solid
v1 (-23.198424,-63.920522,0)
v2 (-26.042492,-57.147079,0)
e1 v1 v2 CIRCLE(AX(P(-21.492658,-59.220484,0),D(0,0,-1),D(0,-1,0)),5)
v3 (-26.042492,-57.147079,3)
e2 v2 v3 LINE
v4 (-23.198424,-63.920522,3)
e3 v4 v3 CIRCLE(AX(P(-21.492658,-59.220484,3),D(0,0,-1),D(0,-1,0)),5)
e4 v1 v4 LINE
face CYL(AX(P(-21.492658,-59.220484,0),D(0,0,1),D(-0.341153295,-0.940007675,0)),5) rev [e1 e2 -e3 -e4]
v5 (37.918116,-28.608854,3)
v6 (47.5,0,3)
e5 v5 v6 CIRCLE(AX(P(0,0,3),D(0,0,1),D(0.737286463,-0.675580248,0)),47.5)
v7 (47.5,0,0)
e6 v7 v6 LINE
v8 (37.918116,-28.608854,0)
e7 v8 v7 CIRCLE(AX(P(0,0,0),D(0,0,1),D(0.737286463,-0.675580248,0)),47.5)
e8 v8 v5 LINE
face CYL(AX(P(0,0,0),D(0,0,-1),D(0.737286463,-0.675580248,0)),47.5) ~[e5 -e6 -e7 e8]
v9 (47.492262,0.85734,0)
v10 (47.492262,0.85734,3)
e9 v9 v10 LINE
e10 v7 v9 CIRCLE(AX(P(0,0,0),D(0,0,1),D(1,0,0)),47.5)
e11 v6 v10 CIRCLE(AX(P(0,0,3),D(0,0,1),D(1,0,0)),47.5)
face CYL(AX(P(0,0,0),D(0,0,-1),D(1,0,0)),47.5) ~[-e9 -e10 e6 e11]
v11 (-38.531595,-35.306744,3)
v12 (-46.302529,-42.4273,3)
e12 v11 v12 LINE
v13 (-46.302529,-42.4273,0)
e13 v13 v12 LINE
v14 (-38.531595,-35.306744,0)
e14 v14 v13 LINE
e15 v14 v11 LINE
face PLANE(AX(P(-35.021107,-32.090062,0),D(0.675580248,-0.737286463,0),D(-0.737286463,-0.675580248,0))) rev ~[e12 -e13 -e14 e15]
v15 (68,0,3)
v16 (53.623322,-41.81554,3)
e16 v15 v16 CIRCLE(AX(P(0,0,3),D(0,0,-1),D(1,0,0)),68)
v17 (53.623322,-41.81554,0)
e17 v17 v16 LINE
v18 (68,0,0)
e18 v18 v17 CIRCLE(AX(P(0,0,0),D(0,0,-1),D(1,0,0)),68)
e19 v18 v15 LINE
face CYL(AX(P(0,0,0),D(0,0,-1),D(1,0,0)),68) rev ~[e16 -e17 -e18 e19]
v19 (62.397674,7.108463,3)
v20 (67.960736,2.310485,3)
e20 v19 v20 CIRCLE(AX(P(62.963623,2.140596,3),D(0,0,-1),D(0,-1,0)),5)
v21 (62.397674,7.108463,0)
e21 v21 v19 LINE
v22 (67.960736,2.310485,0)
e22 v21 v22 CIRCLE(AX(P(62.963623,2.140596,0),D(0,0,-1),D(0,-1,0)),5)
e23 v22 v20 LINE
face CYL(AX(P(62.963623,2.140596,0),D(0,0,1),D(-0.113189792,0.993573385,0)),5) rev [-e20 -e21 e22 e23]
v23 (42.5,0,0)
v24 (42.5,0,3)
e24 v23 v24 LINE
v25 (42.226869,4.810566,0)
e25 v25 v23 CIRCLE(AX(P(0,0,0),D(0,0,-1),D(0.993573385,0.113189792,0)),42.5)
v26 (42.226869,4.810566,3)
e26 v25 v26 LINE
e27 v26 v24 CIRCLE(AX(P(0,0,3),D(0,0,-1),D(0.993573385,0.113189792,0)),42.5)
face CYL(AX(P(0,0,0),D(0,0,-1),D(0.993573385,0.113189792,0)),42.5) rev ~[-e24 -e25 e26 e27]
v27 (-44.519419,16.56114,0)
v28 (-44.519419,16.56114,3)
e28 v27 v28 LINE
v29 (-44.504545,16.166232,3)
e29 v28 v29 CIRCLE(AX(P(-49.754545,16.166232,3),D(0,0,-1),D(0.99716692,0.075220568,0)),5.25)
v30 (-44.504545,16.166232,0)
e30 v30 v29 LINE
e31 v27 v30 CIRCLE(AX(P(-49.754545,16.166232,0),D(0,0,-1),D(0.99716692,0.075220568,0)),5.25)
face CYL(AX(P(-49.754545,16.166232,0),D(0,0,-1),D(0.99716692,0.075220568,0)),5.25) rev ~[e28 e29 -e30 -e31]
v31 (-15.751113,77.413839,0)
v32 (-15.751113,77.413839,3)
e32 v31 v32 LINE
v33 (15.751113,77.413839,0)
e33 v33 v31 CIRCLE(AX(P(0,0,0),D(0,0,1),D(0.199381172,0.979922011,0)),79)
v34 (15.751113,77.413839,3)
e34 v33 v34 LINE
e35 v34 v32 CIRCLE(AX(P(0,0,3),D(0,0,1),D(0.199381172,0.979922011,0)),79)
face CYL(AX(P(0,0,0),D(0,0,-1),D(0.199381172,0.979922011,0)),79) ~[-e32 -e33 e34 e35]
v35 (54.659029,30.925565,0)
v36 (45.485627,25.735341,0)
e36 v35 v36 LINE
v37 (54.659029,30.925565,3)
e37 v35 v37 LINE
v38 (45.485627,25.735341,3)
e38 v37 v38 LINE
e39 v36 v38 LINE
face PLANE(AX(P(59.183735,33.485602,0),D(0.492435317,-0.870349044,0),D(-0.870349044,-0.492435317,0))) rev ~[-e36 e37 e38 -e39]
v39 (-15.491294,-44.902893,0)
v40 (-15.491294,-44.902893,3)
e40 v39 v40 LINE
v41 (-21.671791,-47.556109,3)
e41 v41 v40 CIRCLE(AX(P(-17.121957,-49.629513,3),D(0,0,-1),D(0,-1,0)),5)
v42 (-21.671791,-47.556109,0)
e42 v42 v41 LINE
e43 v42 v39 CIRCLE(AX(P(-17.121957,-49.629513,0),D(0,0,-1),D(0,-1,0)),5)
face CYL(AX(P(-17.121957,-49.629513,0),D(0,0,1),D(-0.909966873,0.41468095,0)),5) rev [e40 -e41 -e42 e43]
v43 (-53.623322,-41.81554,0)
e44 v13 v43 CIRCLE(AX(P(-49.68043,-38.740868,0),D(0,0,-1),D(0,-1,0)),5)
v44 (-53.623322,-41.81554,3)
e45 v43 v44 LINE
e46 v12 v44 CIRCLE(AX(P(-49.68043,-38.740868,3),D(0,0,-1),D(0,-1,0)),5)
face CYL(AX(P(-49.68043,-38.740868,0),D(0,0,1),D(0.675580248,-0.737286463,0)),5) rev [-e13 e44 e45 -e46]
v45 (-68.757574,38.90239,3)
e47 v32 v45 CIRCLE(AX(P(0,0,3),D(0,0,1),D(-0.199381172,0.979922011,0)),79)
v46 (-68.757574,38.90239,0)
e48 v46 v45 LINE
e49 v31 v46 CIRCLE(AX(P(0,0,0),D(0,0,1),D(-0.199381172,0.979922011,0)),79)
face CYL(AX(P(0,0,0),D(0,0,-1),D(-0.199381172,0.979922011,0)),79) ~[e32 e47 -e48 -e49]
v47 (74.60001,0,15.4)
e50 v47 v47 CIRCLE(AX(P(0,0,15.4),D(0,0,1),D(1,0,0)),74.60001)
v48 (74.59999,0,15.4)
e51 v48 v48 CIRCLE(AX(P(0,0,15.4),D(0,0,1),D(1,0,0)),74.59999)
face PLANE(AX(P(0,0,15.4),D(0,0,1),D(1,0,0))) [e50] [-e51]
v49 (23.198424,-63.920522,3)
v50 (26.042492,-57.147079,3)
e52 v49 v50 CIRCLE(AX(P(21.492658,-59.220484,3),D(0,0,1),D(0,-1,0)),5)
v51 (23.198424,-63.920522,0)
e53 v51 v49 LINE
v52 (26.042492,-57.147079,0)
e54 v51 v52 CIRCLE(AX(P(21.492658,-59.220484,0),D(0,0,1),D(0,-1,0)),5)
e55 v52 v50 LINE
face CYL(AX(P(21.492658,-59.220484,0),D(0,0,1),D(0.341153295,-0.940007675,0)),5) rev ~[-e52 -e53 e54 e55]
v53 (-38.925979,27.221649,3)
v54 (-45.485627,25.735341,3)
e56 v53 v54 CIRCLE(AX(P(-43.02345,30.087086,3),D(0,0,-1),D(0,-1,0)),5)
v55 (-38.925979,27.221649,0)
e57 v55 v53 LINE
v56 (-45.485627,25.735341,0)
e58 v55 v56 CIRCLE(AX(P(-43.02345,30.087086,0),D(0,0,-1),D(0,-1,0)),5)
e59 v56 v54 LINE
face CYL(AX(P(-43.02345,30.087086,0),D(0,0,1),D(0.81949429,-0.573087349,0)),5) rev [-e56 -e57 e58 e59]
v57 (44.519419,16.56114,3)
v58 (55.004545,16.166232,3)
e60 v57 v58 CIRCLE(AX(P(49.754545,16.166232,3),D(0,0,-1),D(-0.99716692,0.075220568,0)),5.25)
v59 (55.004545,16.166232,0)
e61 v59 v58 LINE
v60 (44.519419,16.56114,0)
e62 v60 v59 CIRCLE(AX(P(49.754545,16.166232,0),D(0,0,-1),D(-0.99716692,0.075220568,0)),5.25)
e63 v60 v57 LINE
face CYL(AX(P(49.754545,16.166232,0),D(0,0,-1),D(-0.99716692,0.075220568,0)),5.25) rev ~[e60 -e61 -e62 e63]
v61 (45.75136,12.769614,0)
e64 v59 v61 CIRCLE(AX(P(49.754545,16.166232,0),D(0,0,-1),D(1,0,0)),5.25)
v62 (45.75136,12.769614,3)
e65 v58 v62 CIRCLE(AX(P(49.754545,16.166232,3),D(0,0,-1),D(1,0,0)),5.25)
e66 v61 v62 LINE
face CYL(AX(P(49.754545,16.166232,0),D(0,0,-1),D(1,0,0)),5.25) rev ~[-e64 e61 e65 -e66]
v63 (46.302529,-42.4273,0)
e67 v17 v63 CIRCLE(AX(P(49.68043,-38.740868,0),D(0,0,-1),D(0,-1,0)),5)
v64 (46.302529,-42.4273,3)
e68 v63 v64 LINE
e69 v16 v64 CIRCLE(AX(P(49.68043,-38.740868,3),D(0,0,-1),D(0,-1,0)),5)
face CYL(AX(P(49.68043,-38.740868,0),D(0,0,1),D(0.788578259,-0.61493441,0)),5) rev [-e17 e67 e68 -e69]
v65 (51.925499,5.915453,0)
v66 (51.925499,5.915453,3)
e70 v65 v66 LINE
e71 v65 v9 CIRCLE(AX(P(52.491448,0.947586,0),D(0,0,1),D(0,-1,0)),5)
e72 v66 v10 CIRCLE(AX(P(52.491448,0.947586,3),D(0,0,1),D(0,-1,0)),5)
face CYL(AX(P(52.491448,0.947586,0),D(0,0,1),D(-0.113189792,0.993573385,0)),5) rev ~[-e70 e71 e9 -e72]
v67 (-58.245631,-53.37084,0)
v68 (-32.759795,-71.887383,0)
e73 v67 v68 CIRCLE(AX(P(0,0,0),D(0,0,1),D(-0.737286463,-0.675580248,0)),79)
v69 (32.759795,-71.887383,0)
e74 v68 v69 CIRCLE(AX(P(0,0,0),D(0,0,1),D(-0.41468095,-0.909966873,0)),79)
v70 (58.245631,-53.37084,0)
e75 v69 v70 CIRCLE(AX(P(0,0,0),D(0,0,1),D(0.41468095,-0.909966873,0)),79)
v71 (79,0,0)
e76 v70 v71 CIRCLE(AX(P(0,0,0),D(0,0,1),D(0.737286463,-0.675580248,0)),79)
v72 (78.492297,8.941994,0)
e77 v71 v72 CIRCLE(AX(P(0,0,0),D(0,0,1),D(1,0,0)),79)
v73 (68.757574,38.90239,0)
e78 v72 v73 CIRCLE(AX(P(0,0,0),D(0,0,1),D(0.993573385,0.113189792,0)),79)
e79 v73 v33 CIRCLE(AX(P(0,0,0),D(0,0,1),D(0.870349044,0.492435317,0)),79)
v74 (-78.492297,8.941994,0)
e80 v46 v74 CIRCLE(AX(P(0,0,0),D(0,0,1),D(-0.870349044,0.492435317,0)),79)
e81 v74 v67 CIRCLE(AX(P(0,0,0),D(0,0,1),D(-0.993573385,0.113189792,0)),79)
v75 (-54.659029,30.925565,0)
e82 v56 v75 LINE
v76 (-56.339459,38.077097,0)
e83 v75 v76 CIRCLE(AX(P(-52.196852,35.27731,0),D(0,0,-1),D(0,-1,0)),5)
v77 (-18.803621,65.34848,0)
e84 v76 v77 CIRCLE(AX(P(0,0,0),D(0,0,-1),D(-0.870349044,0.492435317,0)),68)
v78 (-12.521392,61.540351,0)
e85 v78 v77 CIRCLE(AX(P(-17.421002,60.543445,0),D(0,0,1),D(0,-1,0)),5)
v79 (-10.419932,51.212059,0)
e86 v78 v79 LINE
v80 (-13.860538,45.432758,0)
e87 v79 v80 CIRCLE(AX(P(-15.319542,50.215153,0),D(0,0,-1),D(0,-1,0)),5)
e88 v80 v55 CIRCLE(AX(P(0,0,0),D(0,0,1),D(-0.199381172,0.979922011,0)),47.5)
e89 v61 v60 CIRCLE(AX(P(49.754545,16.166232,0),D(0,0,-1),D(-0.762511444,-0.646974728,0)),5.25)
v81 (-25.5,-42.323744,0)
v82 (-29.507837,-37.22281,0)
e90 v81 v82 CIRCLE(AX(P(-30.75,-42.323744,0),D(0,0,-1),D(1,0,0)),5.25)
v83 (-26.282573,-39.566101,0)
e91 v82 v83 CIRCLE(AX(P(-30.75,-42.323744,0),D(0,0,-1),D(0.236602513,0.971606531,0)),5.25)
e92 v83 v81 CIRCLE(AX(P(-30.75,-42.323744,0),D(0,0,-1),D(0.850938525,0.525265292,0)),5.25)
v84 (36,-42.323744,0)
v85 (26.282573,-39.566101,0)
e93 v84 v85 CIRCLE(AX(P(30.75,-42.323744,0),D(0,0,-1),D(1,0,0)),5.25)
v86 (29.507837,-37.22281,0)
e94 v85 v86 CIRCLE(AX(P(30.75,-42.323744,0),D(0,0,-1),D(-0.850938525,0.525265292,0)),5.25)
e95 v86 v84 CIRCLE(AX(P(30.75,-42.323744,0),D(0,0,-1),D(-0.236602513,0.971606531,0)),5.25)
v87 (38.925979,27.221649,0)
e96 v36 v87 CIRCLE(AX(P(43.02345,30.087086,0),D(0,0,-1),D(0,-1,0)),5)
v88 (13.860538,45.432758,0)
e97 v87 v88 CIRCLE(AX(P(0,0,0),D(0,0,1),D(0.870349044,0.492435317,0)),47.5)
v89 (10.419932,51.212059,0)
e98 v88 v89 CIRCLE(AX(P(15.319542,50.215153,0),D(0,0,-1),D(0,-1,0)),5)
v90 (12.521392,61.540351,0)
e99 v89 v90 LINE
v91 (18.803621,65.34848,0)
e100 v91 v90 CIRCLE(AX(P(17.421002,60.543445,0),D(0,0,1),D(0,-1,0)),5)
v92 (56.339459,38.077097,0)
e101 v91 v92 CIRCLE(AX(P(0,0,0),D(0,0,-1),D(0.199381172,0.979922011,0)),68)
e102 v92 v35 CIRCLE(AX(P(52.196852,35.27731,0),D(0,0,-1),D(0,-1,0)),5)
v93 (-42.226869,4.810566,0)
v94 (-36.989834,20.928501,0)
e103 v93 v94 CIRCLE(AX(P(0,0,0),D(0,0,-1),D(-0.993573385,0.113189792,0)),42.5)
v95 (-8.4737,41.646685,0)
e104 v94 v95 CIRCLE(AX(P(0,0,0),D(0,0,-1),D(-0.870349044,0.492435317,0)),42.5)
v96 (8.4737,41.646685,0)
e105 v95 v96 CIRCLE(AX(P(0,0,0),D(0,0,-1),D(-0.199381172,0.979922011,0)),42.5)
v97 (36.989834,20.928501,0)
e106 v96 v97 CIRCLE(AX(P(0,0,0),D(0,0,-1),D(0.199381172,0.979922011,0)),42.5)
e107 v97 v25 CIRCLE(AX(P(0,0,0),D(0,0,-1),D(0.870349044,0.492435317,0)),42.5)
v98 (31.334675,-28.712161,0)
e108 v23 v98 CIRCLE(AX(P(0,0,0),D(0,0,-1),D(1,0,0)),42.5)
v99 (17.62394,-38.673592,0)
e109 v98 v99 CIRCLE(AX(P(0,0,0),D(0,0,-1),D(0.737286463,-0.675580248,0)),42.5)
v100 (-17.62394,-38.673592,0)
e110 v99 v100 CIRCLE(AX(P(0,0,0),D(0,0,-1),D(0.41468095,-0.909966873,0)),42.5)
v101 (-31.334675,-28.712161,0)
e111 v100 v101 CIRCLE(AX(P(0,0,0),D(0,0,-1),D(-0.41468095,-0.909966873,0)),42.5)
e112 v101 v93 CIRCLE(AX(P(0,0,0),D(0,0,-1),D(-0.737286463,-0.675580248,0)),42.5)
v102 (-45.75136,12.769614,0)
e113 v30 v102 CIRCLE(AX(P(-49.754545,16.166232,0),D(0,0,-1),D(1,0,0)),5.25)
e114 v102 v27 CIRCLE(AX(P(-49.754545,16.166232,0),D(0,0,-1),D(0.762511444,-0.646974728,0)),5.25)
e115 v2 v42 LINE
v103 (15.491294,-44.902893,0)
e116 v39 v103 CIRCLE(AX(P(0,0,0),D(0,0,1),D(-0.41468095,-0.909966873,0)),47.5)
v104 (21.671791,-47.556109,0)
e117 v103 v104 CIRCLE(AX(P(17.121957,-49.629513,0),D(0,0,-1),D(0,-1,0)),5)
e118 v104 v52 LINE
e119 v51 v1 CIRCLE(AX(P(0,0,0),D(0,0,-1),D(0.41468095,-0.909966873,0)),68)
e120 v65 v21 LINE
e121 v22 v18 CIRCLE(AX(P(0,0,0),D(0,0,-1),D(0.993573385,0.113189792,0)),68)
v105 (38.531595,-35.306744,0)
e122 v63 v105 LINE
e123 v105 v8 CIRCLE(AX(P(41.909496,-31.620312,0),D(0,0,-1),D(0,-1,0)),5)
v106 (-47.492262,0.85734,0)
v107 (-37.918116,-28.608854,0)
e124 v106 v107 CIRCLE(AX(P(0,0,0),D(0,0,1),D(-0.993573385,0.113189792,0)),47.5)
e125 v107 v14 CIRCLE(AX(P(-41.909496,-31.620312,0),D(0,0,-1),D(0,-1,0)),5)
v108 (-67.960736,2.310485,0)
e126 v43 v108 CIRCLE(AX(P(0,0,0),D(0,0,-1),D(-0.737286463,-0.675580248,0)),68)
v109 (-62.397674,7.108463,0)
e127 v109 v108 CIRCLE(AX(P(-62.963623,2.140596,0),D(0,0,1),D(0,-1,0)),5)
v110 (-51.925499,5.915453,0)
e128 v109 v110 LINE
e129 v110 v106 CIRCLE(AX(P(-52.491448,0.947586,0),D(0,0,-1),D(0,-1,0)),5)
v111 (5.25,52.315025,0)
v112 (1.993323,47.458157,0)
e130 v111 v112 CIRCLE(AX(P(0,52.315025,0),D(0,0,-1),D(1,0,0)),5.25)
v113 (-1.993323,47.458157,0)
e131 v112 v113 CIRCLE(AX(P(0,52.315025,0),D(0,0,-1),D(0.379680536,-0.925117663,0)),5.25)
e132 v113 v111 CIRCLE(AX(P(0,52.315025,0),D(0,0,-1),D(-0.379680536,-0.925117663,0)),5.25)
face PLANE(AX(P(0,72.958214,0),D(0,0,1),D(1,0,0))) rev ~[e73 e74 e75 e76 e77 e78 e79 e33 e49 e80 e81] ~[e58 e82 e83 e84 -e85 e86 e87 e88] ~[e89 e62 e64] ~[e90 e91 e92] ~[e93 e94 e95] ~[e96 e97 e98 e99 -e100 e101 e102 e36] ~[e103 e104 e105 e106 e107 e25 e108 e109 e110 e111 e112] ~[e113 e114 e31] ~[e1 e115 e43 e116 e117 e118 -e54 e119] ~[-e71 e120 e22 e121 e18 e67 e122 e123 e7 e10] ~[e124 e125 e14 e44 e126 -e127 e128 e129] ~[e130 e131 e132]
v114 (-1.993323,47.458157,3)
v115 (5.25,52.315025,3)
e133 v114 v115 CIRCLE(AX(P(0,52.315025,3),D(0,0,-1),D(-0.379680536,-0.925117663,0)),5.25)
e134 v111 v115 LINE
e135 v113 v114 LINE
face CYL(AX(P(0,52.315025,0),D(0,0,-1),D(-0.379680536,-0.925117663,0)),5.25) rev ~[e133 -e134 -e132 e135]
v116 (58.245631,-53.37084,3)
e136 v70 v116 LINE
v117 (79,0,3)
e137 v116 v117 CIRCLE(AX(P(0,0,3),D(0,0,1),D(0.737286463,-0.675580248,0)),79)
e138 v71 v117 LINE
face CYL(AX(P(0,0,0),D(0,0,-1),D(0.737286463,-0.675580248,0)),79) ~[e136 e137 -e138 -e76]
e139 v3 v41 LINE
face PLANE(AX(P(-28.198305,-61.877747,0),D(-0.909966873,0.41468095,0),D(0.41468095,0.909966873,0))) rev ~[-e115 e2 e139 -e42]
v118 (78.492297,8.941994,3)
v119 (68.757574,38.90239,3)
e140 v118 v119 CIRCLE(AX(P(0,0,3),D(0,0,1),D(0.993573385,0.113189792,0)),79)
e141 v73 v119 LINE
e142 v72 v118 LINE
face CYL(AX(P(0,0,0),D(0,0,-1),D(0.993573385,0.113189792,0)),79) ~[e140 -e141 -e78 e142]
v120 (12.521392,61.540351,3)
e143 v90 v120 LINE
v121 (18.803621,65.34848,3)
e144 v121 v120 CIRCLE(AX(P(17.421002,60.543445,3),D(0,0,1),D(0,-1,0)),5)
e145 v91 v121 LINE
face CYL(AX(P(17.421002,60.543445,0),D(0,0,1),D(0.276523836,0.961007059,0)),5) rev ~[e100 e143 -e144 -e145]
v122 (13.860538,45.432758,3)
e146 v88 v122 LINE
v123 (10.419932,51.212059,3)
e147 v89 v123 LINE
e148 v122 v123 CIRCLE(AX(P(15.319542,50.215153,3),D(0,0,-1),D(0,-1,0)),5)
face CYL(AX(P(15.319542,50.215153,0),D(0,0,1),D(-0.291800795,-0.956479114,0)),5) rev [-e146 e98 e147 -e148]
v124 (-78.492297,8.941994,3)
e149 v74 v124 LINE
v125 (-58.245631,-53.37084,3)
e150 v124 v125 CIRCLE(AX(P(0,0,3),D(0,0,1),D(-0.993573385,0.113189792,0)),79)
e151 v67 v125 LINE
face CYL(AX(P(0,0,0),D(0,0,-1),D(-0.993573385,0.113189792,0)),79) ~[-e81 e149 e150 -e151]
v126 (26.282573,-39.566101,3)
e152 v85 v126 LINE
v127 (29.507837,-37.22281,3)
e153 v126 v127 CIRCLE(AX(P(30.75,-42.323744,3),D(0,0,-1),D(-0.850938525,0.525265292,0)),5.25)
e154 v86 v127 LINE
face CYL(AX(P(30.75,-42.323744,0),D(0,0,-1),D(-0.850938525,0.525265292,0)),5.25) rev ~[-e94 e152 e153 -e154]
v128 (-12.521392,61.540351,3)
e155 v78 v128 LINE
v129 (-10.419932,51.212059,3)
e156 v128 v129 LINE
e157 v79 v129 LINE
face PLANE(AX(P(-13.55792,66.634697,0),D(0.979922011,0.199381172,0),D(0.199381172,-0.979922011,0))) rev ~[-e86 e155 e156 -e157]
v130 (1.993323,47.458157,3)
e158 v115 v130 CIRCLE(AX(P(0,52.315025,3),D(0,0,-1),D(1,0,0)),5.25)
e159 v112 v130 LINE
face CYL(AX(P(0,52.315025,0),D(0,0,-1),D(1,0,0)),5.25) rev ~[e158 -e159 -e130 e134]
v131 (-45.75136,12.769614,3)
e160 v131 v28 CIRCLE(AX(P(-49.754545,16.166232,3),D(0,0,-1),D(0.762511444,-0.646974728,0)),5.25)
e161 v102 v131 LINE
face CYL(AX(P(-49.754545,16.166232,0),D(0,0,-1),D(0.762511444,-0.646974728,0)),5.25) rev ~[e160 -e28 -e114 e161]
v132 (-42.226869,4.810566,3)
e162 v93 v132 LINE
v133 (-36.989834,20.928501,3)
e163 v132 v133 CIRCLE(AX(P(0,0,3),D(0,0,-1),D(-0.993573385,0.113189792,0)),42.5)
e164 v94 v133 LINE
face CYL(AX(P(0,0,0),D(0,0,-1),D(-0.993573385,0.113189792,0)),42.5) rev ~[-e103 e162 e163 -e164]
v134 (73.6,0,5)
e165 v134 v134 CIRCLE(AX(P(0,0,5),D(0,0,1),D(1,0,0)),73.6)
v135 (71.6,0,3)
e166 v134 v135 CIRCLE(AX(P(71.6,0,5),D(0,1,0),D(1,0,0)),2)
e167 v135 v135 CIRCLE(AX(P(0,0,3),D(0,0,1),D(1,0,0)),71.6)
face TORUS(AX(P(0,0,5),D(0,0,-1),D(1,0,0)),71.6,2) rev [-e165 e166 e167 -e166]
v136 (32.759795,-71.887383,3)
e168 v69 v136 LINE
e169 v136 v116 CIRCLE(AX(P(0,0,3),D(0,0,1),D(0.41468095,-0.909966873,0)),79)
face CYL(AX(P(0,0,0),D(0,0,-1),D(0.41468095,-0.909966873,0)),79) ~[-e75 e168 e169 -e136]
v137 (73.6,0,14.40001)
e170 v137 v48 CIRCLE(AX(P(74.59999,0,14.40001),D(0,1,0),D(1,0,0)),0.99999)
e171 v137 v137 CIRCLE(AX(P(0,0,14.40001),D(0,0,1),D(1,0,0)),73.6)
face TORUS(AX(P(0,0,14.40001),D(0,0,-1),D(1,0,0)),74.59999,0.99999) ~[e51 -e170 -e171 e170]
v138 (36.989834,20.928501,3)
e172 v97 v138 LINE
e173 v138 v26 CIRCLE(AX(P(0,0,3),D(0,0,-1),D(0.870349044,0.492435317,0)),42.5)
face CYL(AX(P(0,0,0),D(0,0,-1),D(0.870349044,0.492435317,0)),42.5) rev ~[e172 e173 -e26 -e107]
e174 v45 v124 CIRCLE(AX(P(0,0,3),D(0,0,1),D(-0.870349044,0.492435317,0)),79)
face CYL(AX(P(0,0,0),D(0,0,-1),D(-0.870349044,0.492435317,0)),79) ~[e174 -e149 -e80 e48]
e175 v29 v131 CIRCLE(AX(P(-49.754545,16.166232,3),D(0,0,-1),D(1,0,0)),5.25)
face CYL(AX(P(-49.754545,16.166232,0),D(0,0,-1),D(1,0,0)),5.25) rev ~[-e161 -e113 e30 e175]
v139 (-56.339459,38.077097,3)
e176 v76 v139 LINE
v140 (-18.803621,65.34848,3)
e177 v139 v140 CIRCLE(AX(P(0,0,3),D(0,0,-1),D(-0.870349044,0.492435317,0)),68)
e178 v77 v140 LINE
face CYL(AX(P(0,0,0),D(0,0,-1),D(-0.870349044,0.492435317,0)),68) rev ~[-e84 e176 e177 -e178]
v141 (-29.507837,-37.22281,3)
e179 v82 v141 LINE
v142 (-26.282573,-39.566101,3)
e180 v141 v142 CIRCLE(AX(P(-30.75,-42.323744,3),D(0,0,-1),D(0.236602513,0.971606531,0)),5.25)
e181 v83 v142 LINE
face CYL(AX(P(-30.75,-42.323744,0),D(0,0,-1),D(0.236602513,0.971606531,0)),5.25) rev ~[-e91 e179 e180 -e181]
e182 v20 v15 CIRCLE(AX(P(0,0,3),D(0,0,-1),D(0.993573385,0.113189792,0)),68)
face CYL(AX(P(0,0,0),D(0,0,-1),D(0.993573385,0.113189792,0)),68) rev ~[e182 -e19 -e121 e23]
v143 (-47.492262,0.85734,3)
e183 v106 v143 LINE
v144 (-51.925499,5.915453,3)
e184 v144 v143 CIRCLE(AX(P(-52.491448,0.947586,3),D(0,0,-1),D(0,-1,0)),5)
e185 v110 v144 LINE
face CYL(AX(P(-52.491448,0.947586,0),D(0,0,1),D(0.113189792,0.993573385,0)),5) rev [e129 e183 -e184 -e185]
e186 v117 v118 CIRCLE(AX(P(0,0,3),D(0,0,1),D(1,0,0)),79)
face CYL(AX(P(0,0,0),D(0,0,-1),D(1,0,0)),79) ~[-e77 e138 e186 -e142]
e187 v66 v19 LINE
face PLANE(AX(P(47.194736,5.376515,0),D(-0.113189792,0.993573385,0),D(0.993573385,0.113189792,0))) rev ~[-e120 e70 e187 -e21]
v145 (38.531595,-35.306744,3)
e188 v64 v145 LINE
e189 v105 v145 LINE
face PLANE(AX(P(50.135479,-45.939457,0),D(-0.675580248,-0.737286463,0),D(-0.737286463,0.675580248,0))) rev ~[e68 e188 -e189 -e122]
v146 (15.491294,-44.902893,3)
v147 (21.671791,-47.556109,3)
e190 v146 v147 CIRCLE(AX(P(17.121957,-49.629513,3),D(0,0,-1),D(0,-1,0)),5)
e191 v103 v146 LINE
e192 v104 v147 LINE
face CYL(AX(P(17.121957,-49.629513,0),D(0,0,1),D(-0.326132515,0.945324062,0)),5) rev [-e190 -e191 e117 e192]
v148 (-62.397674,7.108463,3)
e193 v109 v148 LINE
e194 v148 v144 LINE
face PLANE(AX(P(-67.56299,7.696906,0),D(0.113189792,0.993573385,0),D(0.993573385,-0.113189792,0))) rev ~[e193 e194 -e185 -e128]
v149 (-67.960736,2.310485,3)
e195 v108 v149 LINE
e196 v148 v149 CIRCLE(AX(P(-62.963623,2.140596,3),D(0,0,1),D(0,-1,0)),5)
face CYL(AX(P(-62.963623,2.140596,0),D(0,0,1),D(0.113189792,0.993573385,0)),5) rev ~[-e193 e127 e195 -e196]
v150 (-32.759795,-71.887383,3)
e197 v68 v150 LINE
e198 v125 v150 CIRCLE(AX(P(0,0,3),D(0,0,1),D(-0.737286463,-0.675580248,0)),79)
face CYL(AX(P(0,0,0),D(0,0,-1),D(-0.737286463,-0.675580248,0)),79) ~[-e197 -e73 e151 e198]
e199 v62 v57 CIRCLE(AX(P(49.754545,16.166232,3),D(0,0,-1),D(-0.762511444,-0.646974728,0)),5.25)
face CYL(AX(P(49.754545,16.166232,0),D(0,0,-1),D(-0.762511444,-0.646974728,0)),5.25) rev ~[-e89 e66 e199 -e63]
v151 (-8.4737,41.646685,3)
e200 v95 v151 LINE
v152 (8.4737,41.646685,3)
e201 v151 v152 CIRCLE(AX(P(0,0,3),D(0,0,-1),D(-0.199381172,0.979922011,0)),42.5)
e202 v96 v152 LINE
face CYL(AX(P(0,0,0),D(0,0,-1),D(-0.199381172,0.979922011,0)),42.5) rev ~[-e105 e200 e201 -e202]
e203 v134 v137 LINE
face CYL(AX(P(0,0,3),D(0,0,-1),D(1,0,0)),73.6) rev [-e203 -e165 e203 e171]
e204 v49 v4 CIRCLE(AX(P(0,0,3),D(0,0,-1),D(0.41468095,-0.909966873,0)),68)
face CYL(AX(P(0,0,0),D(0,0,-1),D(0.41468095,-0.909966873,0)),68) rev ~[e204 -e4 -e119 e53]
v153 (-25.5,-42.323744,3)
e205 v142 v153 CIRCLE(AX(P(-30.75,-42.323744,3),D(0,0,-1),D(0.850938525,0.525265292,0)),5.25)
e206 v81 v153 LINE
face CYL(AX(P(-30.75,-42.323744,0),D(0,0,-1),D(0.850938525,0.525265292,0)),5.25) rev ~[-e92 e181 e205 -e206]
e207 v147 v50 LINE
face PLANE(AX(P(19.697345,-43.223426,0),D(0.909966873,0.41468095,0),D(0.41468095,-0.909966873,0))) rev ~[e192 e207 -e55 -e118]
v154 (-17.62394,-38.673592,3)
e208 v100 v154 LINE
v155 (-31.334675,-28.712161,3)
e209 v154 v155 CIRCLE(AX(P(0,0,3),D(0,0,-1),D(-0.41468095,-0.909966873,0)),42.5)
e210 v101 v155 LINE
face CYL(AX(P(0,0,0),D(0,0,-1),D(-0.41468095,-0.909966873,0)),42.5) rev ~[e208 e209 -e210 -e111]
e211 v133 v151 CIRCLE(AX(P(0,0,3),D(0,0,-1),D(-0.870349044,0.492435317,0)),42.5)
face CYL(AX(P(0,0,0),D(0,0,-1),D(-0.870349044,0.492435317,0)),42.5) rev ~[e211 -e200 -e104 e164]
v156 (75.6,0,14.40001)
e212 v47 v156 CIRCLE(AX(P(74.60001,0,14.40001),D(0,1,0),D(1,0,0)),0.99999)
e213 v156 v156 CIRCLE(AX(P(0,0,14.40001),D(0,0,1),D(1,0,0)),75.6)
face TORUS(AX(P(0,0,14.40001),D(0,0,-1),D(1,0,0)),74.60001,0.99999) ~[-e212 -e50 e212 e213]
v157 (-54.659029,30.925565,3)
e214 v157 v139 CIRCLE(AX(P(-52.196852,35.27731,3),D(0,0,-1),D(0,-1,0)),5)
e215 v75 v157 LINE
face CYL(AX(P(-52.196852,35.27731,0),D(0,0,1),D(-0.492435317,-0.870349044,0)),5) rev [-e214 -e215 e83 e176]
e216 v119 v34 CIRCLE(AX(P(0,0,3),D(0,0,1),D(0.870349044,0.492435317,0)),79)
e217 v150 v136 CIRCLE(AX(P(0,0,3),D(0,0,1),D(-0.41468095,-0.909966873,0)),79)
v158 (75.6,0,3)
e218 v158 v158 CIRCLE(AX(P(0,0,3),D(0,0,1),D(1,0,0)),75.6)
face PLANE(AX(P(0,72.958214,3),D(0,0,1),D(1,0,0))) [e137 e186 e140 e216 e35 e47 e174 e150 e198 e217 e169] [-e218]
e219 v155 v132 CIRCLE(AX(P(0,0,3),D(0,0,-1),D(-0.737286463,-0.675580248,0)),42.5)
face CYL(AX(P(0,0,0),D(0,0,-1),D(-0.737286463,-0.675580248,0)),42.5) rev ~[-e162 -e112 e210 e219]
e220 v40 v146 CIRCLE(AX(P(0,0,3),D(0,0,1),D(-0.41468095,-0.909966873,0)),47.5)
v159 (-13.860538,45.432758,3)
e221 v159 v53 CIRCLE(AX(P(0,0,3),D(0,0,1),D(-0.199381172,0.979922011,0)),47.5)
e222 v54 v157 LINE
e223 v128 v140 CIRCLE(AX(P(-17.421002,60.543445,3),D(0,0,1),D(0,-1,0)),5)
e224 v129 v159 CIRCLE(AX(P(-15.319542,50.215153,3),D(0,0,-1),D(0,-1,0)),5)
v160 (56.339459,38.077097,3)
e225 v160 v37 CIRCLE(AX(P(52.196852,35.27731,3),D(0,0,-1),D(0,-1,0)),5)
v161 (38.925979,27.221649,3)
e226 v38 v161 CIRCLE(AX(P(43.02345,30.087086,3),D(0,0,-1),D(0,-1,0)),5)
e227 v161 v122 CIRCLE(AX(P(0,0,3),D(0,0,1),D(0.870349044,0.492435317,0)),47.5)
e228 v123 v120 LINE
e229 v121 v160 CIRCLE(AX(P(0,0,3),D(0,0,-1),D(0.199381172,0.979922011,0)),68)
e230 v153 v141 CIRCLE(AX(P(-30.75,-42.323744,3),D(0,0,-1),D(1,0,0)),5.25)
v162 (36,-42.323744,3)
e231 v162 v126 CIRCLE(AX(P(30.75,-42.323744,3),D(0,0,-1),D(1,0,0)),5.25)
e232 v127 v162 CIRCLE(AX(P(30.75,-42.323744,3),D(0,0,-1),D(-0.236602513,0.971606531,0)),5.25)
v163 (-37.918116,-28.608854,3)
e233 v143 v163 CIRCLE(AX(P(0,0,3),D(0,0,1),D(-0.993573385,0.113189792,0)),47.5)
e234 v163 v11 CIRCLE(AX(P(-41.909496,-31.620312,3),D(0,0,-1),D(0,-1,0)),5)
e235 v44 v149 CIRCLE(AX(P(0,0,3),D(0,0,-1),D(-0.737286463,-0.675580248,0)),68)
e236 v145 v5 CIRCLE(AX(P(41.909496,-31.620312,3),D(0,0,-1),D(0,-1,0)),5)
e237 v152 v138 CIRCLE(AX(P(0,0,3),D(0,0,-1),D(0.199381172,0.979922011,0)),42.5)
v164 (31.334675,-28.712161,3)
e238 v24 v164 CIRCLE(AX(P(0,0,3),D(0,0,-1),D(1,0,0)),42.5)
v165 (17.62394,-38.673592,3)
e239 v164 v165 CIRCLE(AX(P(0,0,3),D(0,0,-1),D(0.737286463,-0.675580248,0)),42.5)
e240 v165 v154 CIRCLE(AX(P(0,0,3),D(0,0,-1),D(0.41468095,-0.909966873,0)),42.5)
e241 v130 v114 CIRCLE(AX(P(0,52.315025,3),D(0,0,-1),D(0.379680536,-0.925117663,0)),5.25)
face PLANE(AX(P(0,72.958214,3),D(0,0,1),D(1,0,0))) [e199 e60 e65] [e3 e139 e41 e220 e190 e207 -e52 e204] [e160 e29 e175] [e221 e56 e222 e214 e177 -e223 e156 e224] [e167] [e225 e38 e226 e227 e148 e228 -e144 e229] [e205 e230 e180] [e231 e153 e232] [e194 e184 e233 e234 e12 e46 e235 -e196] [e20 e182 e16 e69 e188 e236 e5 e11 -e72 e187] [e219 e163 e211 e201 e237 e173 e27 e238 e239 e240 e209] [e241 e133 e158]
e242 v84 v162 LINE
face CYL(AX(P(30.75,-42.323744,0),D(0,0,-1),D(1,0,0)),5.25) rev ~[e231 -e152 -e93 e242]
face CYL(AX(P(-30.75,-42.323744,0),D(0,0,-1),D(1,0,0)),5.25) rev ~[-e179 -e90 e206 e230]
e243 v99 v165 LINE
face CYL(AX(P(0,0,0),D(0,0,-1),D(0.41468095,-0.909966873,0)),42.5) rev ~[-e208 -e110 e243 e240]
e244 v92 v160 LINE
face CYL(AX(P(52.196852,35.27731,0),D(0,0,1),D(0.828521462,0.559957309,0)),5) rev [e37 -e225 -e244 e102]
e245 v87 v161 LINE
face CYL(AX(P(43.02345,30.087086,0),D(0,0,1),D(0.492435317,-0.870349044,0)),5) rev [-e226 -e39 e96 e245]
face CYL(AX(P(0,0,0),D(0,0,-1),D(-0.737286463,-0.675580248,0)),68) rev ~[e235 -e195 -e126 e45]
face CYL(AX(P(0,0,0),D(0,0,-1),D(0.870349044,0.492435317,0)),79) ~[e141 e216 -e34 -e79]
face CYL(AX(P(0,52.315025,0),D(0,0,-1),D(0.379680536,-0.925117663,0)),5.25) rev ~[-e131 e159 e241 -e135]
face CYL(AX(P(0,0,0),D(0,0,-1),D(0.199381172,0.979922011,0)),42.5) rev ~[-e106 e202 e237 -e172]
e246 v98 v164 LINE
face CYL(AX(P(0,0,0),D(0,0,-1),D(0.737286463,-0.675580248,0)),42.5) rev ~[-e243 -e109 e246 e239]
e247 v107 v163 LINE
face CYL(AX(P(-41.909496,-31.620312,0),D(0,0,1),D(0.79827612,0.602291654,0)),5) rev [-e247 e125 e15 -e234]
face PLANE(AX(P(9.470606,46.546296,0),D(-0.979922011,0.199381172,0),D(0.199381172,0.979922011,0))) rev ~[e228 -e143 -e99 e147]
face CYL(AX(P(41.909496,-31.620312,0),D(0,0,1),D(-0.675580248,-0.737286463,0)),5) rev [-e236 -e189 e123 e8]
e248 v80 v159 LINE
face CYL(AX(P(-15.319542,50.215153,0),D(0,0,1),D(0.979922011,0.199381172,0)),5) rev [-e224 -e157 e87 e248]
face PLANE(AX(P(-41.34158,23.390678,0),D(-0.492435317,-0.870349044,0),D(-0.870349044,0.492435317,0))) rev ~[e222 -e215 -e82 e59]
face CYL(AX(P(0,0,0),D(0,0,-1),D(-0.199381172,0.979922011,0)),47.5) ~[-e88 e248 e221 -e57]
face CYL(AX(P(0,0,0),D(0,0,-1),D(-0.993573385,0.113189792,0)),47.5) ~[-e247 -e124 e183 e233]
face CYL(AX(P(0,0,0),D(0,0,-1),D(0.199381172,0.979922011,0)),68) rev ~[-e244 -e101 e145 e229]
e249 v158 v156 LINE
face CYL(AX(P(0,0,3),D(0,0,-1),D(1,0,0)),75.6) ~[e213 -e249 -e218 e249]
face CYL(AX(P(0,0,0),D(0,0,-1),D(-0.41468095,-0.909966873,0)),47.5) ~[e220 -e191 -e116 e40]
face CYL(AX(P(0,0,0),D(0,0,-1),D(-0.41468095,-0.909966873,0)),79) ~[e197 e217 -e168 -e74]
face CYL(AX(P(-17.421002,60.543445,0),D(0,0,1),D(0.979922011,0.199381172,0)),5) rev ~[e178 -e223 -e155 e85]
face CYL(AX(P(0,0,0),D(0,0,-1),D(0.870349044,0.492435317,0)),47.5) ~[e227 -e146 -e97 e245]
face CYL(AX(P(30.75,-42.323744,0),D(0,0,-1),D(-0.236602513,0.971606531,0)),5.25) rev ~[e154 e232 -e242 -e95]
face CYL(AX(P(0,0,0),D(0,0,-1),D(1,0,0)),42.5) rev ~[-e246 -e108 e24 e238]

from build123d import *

# Parameters (mm, degrees)
F1_DEPTH = 3
F2_R     = 5
F3_R     = 75.6
F3_R_2   = 73.6
F4_DEPTH = 12.4
F5_R     = 0.99999
F6_R     = 2


# Not quite as in the source:
# - a fillet or chamfer is up to 0.001 mm smaller than in the source, because OpenCascade refuses the exact size


with BuildPart() as f1:
    # F0 (on Top) → F1 (new body)
    with BuildSketch(Plane.XY):
        with BuildLine():
            ThreePointArc((-13.5579196876, 66.6346967709), (0, 68), (13.5579196876, 66.6346967709))
            Line((13.5579196876, 66.6346967709), (15.7511125782, 77.4138388956))
            ThreePointArc((15.7511125782, 77.4138388956), (0, 79), (-15.7511125782, 77.4138388956))
            Line((-15.7511125782, 77.4138388956), (-13.5579196876, 66.6346967709))
        make_face()
        with BuildLine():
            ThreePointArc((13.5579196876, 66.6346967709), (39.9693971559, 55.0131556175), (59.1837349834, 33.4856015835))
            Line((59.1837349834, 33.4856015835), (68.7575744661, 38.902390075))
            ThreePointArc((68.7575744661, 38.902390075), (46.4350349311, 63.9123425556), (15.7511125782, 77.4138388956))
            Line((15.7511125782, 77.4138388956), (13.5579196876, 66.6346967709))
        make_face()
        with BuildLine():
            ThreePointArc((8.4736998047, 41.6466854818), (24.9808732224, 34.3832222609), (36.9898343647, 20.9285009897))
            Line((36.9898343647, 20.9285009897), (41.341579584, 23.3906775767))
            ThreePointArc((41.341579584, 23.3906775767), (27.9197994839, 38.4283072328), (9.4706056641, 46.5462955385))
            Line((9.4706056641, 46.5462955385), (8.4736998047, 41.6466854818))
        make_face()
        with BuildLine():
            ThreePointArc((-8.4736998047, 41.6466854818), (0, 42.5), (8.4736998047, 41.6466854818))
            Line((8.4736998047, 41.6466854818), (9.4706056641, 46.5462955385))
            ThreePointArc((9.4706056641, 46.5462955385), (5.7500684223, 47.1506809404), (1.9933228139, 47.4581569823))
            ThreePointArc((1.9933228139, 47.4581569823), (0, 47.0650247137), (-1.9933228139, 47.4581569823))
            ThreePointArc((-1.9933228139, 47.4581569823), (-5.7500684223, 47.1506809404), (-9.4706056641, 46.5462955385))
            Line((-9.4706056641, 46.5462955385), (-8.4736998047, 41.6466854818))
        make_face()
        with BuildLine():
            ThreePointArc((1.9933228139, 47.4581569823), (5.7500684223, 47.1506809404), (9.4706056641, 46.5462955385))
            Line((9.4706056641, 46.5462955385), (13.5579196876, 66.6346967709))
            ThreePointArc((13.5579196876, 66.6346967709), (0, 68), (-13.5579196876, 66.6346967709))
            Line((-13.5579196876, 66.6346967709), (-9.4706056641, 46.5462955385))
            ThreePointArc((-9.4706056641, 46.5462955385), (-5.7500684223, 47.1506809404), (-1.9933228139, 47.4581569823))
            ThreePointArc((-1.9933228139, 47.4581569823), (-2.9238292723, 56.6754974388), (5.25, 52.3150247137))
            ThreePointArc((5.25, 52.3150247137), (4.3604727251, 49.3911954414), (1.9933228139, 47.4581569823))
        make_face()
        with BuildLine():
            ThreePointArc((45.7513600742, 12.769614378), (46.6198312174, 9.1017216648), (47.1947357785, 5.3765151165))
            Line((47.1947357785, 5.3765151165), (67.5629901671, 7.6969058509))
            ThreePointArc((67.5629901671, 7.6969058509), (64.6718431081, 21.0131556175), (59.1837349834, 33.4856015835))
            Line((59.1837349834, 33.4856015835), (41.341579584, 23.3906775767))
            ThreePointArc((41.341579584, 23.3906775767), (43.0660934948, 20.039001749), (44.5194188246, 16.5611396805))
            ThreePointArc((44.5194188246, 16.5611396805), (49.952139145, 21.4125119623), (55.0045451541, 16.1662316977))
            ThreePointArc((55.0045451541, 16.1662316977), (51.5636579657, 11.2377825669), (45.7513600742, 12.769614378))
        make_face()
        with BuildLine():
            ThreePointArc((36.9898343647, 20.9285009897), (40.4199019425, 13.1332222609), (42.2268688544, 4.8105661568))
            Line((42.2268688544, 4.8105661568), (47.1947357785, 5.3765151165))
            ThreePointArc((47.1947357785, 5.3765151165), (46.6198312174, 9.1017216648), (45.7513600742, 12.769614378))
            ThreePointArc((45.7513600742, 12.769614378), (44.7614984435, 14.5438924772), (44.5194188246, 16.5611396805))
            ThreePointArc((44.5194188246, 16.5611396805), (43.0660934948, 20.039001749), (41.341579584, 23.3906775767))
            Line((41.341579584, 23.3906775767), (36.9898343647, 20.9285009897))
        make_face()
        with BuildLine():
            ThreePointArc((59.1837349834, 33.4856015835), (64.6718431081, 21.0131556175), (67.5629901671, 7.6969058509))
            Line((67.5629901671, 7.6969058509), (78.4922974, 8.9419935621))
            ThreePointArc((78.4922974, 8.9419935621), (75.1334647873, 24.4123425556), (68.7575744661, 38.902390075))
            Line((68.7575744661, 38.902390075), (59.1837349834, 33.4856015835))
        make_face()
        with BuildLine():
            Line((78.4922974, 8.9419935621), (67.5629901671, 7.6969058509))
            ThreePointArc((67.5629901671, 7.6969058509), (67.890659635, 3.8546509982), (68, 0))
            ThreePointArc((68, 0), (63.3767015757, -24.6453585365), (50.1354794885, -45.9394568585))
            Line((50.1354794885, -45.9394568585), (58.2456305823, -53.3708395856))
            ThreePointArc((58.2456305823, -53.3708395856), (73.6288150658, -28.6321077115), (79, 0))
            ThreePointArc((79, 0), (78.8729722231, 4.4781974832), (78.4922974, 8.9419935621))
        make_face()
        with BuildLine():
            ThreePointArc((42.2268688544, 4.8105661568), (42.4316622719, 2.4091568739), (42.5, 0))
            ThreePointArc((42.5, 0), (39.6104384848, -15.4033490853), (31.3346746803, -28.7121605366))
            Line((31.3346746803, -28.7121605366), (35.0211069957, -32.0900617762))
            ThreePointArc((35.0211069957, -32.0900617762), (44.2704900712, -17.2155078012), (47.5, 0))
            ThreePointArc((47.5, 0), (47.4236225392, 2.6925870943), (47.1947357785, 5.3765151165))
            Line((47.1947357785, 5.3765151165), (42.2268688544, 4.8105661568))
        make_face()
        with BuildLine():
            Line((35.0211069957, -32.0900617762), (31.3346746803, -28.7121605366))
            ThreePointArc((31.3346746803, -28.7121605366), (24.9808732224, -34.3832222609), (17.6239403858, -38.6735920917))
            Line((17.6239403858, -38.6735920917), (19.6973451371, -43.2234264555))
            ThreePointArc((19.6973451371, -43.2234264555), (23.0625718199, -41.5255075954), (26.2825727435, -39.5661012735))
            ThreePointArc((26.2825727435, -39.5661012735), (27.6641274255, -38.076404834), (29.5078368069, -37.2228097673))
            ThreePointArc((29.5078368069, -37.2228097673), (32.3663779647, -34.7658967588), (35.0211069957, -32.0900617762))
        make_face()
        with BuildLine():
            Line((19.6973451371, -43.2234264555), (17.6239403858, -38.6735920917))
            ThreePointArc((17.6239403858, -38.6735920917), (0, -42.5), (-17.6239403858, -38.6735920917))
            Line((-17.6239403858, -38.6735920917), (-19.6973451371, -43.2234264555))
            ThreePointArc((-19.6973451371, -43.2234264555), (0, -47.5), (19.6973451371, -43.2234264555))
        make_face()
        with BuildLine():
            ThreePointArc((-17.6239403858, -38.6735920917), (-24.9808732224, -34.3832222609), (-31.3346746803, -28.7121605366))
            Line((-31.3346746803, -28.7121605366), (-35.0211069957, -32.0900617762))
            ThreePointArc((-35.0211069957, -32.0900617762), (-32.3663779647, -34.7658967588), (-29.5078368069, -37.2228097673))
            ThreePointArc((-29.5078368069, -37.2228097673), (-27.6641274255, -38.076404834), (-26.2825727435, -39.5661012735))
            ThreePointArc((-26.2825727435, -39.5661012735), (-23.0625718199, -41.5255075954), (-19.6973451371, -43.2234264555))
            Line((-19.6973451371, -43.2234264555), (-17.6239403858, -38.6735920917))
        make_face()
        with BuildLine():
            Line((-35.0211069957, -32.0900617762), (-31.3346746803, -28.7121605366))
            ThreePointArc((-31.3346746803, -28.7121605366), (-40.4199019425, -13.1332222609), (-42.2268688544, 4.8105661568))
            Line((-42.2268688544, 4.8105661568), (-47.1947357785, 5.3765151165))
            ThreePointArc((-47.1947357785, 5.3765151165), (-45.175184524, -14.6783072328), (-35.0211069957, -32.0900617762))
        make_face()
        with BuildLine():
            ThreePointArc((-42.2268688544, 4.8105661568), (-40.4199019425, 13.1332222609), (-36.9898343647, 20.9285009897))
            Line((-36.9898343647, 20.9285009897), (-41.341579584, 23.3906775767))
            ThreePointArc((-41.341579584, 23.3906775767), (-43.0660934948, 20.039001749), (-44.5194188246, 16.5611396805))
            ThreePointArc((-44.5194188246, 16.5611396805), (-44.5082648895, 16.3638256886), (-44.5045451541, 16.1662316977))
            ThreePointArc((-44.5045451541, 16.1662316977), (-44.8260960233, 14.357118886), (-45.7513600742, 12.769614378))
            ThreePointArc((-45.7513600742, 12.769614378), (-46.6198312174, 9.1017216648), (-47.1947357785, 5.3765151165))
            Line((-47.1947357785, 5.3765151165), (-42.2268688544, 4.8105661568))
        make_face()
        with BuildLine():
            Line((-41.341579584, 23.3906775767), (-36.9898343647, 20.9285009897))
            ThreePointArc((-36.9898343647, 20.9285009897), (-24.9808732224, 34.3832222609), (-8.4736998047, 41.6466854818))
            Line((-8.4736998047, 41.6466854818), (-9.4706056641, 46.5462955385))
            ThreePointArc((-9.4706056641, 46.5462955385), (-27.9197994839, 38.4283072328), (-41.341579584, 23.3906775767))
        make_face()
        with BuildLine():
            ThreePointArc((-44.5194188246, 16.5611396805), (-43.0660934948, 20.039001749), (-41.341579584, 23.3906775767))
            Line((-41.341579584, 23.3906775767), (-59.1837349834, 33.4856015835))
            ThreePointArc((-59.1837349834, 33.4856015835), (-64.6718431081, 21.0131556175), (-67.5629901671, 7.6969058509))
            Line((-67.5629901671, 7.6969058509), (-47.1947357785, 5.3765151165))
            ThreePointArc((-47.1947357785, 5.3765151165), (-46.6198312174, 9.1017216648), (-45.7513600742, 12.769614378))
            ThreePointArc((-45.7513600742, 12.769614378), (-54.7475918646, 17.7885709181), (-44.5194188246, 16.5611396805))
        make_face()
        with BuildLine():
            ThreePointArc((-67.5629901671, 7.6969058509), (-64.6718431081, 21.0131556175), (-59.1837349834, 33.4856015835))
            Line((-59.1837349834, 33.4856015835), (-68.7575744661, 38.902390075))
            ThreePointArc((-68.7575744661, 38.902390075), (-75.1334647873, 24.4123425556), (-78.4922974, 8.9419935621))
            Line((-78.4922974, 8.9419935621), (-67.5629901671, 7.6969058509))
        make_face()
        with BuildLine():
            ThreePointArc((-28.1983046173, -61.8777473468), (-39.9693971559, -55.0131556175), (-50.1354794885, -45.9394568585))
            Line((-50.1354794885, -45.9394568585), (-58.2456305823, -53.3708395856))
            ThreePointArc((-58.2456305823, -53.3708395856), (-46.4350349311, -63.9123425556), (-32.7597950701, -71.887382947))
            Line((-32.7597950701, -71.887382947), (-28.1983046173, -61.8777473468))
        make_face()
        with BuildLine():
            ThreePointArc((-29.5078368069, -37.2228097673), (-32.3663779647, -34.7658967588), (-35.0211069957, -32.0900617762))
            Line((-35.0211069957, -32.0900617762), (-50.1354794885, -45.9394568585))
            ThreePointArc((-50.1354794885, -45.9394568585), (-39.9693971559, -55.0131556175), (-28.1983046173, -61.8777473468))
            Line((-28.1983046173, -61.8777473468), (-19.6973451371, -43.2234264555))
            ThreePointArc((-19.6973451371, -43.2234264555), (-23.0625718199, -41.5255075954), (-26.2825727435, -39.5661012735))
            ThreePointArc((-26.2825727435, -39.5661012735), (-25.6994310669, -40.8904773481), (-25.5, -42.3237440545))
            ThreePointArc((-25.5, -42.3237440545), (-34.8781870575, -45.5672871201), (-29.5078368069, -37.2228097673))
        make_face()
        with BuildLine():
            Line((-58.2456305823, -53.3708395856), (-50.1354794885, -45.9394568585))
            ThreePointArc((-50.1354794885, -45.9394568585), (-64.6718431081, -21.0131556175), (-67.5629901671, 7.6969058509))
            Line((-67.5629901671, 7.6969058509), (-78.4922974, 8.9419935621))
            ThreePointArc((-78.4922974, 8.9419935621), (-75.1334647873, -24.4123425556), (-58.2456305823, -53.3708395856))
        make_face()
        with BuildLine():
            Line((-68.7575744661, 38.902390075), (-59.1837349834, 33.4856015835))
            ThreePointArc((-59.1837349834, 33.4856015835), (-39.9693971559, 55.0131556175), (-13.5579196876, 66.6346967709))
            Line((-13.5579196876, 66.6346967709), (-15.7511125782, 77.4138388956))
            ThreePointArc((-15.7511125782, 77.4138388956), (-46.4350349311, 63.9123425556), (-68.7575744661, 38.902390075))
        make_face()
        with BuildLine():
            Line((32.7597950701, -71.887382947), (28.1983046173, -61.8777473468))
            ThreePointArc((28.1983046173, -61.8777473468), (0, -68), (-28.1983046173, -61.8777473468))
            Line((-28.1983046173, -61.8777473468), (-32.7597950701, -71.887382947))
            ThreePointArc((-32.7597950701, -71.887382947), (0, -79), (32.7597950701, -71.887382947))
        make_face()
        with BuildLine():
            Line((58.2456305823, -53.3708395856), (50.1354794885, -45.9394568585))
            ThreePointArc((50.1354794885, -45.9394568585), (39.9693971559, -55.0131556175), (28.1983046173, -61.8777473468))
            Line((28.1983046173, -61.8777473468), (32.7597950701, -71.887382947))
            ThreePointArc((32.7597950701, -71.887382947), (46.4350349311, -63.9123425556), (58.2456305823, -53.3708395856))
        make_face()
        with BuildLine():
            Line((50.1354794885, -45.9394568585), (35.0211069957, -32.0900617762))
            ThreePointArc((35.0211069957, -32.0900617762), (32.3663779647, -34.7658967588), (29.5078368069, -37.2228097673))
            ThreePointArc((29.5078368069, -37.2228097673), (33.9935430656, -38.195556997), (36, -42.3237440545))
            ThreePointArc((36, -42.3237440545), (29.3167332936, -47.3743129876), (26.2825727435, -39.5661012735))
            ThreePointArc((26.2825727435, -39.5661012735), (23.0625718199, -41.5255075954), (19.6973451371, -43.2234264555))
            Line((19.6973451371, -43.2234264555), (28.1983046173, -61.8777473468))
            ThreePointArc((28.1983046173, -61.8777473468), (39.9693971559, -55.0131556175), (50.1354794885, -45.9394568585))
        make_face()
    extrude(amount=F1_DEPTH)

    # F2
    f2_edges = [f1.edges().sort_by_distance(p)[0] for p in [
        (13.55792, 66.634697, 1.5),
        (59.183735, 33.485602, 1.5),
        (41.34158, 23.390678, 1.5),
        (9.470606, 46.546296, 1.5),
        (35.021107, -32.090062, 1.5),
        (47.194736, 5.376515, 1.5),
        (67.56299, 7.696906, 1.5),
        (-13.55792, 66.634697, 1.5),
        (50.135479, -45.939457, 1.5),
        (28.198305, -61.877747, 1.5),
        (19.697345, -43.223426, 1.5),
        (-47.194736, 5.376515, 1.5),
        (-35.021107, -32.090062, 1.5),
        (-19.697345, -43.223426, 1.5),
        (-28.198305, -61.877747, 1.5),
        (-50.135479, -45.939457, 1.5),
        (-67.56299, 7.696906, 1.5),
        (-59.183735, 33.485602, 1.5),
        (-41.34158, 23.390678, 1.5),
        (-9.470606, 46.546296, 1.5),
    ]]
    fillet(f2_edges, radius=F2_R)

    # F3 (on face) → F4 (join)
    with BuildSketch(Plane.XY.offset(3)):
        Circle(F3_R)
        Circle(F3_R_2, mode=Mode.SUBTRACT)
    extrude(amount=F4_DEPTH)

    # F5 (radius 1 in the source; OpenCascade refuses exactly that, so slightly less here)
    f5_edges = [f1.edges().sort_by_distance(p)[0] for p in [
        (-75.6, 0, 15.4),
        (-73.6, 0, 15.4),
    ]]
    fillet(f5_edges, radius=F5_R)

    # F6
    f6_edges = [f1.edges().sort_by_distance(p)[0] for p in [
        (-73.6, 0, 3),
    ]]
    fillet(f6_edges, radius=F6_R)


solid = f1.part
